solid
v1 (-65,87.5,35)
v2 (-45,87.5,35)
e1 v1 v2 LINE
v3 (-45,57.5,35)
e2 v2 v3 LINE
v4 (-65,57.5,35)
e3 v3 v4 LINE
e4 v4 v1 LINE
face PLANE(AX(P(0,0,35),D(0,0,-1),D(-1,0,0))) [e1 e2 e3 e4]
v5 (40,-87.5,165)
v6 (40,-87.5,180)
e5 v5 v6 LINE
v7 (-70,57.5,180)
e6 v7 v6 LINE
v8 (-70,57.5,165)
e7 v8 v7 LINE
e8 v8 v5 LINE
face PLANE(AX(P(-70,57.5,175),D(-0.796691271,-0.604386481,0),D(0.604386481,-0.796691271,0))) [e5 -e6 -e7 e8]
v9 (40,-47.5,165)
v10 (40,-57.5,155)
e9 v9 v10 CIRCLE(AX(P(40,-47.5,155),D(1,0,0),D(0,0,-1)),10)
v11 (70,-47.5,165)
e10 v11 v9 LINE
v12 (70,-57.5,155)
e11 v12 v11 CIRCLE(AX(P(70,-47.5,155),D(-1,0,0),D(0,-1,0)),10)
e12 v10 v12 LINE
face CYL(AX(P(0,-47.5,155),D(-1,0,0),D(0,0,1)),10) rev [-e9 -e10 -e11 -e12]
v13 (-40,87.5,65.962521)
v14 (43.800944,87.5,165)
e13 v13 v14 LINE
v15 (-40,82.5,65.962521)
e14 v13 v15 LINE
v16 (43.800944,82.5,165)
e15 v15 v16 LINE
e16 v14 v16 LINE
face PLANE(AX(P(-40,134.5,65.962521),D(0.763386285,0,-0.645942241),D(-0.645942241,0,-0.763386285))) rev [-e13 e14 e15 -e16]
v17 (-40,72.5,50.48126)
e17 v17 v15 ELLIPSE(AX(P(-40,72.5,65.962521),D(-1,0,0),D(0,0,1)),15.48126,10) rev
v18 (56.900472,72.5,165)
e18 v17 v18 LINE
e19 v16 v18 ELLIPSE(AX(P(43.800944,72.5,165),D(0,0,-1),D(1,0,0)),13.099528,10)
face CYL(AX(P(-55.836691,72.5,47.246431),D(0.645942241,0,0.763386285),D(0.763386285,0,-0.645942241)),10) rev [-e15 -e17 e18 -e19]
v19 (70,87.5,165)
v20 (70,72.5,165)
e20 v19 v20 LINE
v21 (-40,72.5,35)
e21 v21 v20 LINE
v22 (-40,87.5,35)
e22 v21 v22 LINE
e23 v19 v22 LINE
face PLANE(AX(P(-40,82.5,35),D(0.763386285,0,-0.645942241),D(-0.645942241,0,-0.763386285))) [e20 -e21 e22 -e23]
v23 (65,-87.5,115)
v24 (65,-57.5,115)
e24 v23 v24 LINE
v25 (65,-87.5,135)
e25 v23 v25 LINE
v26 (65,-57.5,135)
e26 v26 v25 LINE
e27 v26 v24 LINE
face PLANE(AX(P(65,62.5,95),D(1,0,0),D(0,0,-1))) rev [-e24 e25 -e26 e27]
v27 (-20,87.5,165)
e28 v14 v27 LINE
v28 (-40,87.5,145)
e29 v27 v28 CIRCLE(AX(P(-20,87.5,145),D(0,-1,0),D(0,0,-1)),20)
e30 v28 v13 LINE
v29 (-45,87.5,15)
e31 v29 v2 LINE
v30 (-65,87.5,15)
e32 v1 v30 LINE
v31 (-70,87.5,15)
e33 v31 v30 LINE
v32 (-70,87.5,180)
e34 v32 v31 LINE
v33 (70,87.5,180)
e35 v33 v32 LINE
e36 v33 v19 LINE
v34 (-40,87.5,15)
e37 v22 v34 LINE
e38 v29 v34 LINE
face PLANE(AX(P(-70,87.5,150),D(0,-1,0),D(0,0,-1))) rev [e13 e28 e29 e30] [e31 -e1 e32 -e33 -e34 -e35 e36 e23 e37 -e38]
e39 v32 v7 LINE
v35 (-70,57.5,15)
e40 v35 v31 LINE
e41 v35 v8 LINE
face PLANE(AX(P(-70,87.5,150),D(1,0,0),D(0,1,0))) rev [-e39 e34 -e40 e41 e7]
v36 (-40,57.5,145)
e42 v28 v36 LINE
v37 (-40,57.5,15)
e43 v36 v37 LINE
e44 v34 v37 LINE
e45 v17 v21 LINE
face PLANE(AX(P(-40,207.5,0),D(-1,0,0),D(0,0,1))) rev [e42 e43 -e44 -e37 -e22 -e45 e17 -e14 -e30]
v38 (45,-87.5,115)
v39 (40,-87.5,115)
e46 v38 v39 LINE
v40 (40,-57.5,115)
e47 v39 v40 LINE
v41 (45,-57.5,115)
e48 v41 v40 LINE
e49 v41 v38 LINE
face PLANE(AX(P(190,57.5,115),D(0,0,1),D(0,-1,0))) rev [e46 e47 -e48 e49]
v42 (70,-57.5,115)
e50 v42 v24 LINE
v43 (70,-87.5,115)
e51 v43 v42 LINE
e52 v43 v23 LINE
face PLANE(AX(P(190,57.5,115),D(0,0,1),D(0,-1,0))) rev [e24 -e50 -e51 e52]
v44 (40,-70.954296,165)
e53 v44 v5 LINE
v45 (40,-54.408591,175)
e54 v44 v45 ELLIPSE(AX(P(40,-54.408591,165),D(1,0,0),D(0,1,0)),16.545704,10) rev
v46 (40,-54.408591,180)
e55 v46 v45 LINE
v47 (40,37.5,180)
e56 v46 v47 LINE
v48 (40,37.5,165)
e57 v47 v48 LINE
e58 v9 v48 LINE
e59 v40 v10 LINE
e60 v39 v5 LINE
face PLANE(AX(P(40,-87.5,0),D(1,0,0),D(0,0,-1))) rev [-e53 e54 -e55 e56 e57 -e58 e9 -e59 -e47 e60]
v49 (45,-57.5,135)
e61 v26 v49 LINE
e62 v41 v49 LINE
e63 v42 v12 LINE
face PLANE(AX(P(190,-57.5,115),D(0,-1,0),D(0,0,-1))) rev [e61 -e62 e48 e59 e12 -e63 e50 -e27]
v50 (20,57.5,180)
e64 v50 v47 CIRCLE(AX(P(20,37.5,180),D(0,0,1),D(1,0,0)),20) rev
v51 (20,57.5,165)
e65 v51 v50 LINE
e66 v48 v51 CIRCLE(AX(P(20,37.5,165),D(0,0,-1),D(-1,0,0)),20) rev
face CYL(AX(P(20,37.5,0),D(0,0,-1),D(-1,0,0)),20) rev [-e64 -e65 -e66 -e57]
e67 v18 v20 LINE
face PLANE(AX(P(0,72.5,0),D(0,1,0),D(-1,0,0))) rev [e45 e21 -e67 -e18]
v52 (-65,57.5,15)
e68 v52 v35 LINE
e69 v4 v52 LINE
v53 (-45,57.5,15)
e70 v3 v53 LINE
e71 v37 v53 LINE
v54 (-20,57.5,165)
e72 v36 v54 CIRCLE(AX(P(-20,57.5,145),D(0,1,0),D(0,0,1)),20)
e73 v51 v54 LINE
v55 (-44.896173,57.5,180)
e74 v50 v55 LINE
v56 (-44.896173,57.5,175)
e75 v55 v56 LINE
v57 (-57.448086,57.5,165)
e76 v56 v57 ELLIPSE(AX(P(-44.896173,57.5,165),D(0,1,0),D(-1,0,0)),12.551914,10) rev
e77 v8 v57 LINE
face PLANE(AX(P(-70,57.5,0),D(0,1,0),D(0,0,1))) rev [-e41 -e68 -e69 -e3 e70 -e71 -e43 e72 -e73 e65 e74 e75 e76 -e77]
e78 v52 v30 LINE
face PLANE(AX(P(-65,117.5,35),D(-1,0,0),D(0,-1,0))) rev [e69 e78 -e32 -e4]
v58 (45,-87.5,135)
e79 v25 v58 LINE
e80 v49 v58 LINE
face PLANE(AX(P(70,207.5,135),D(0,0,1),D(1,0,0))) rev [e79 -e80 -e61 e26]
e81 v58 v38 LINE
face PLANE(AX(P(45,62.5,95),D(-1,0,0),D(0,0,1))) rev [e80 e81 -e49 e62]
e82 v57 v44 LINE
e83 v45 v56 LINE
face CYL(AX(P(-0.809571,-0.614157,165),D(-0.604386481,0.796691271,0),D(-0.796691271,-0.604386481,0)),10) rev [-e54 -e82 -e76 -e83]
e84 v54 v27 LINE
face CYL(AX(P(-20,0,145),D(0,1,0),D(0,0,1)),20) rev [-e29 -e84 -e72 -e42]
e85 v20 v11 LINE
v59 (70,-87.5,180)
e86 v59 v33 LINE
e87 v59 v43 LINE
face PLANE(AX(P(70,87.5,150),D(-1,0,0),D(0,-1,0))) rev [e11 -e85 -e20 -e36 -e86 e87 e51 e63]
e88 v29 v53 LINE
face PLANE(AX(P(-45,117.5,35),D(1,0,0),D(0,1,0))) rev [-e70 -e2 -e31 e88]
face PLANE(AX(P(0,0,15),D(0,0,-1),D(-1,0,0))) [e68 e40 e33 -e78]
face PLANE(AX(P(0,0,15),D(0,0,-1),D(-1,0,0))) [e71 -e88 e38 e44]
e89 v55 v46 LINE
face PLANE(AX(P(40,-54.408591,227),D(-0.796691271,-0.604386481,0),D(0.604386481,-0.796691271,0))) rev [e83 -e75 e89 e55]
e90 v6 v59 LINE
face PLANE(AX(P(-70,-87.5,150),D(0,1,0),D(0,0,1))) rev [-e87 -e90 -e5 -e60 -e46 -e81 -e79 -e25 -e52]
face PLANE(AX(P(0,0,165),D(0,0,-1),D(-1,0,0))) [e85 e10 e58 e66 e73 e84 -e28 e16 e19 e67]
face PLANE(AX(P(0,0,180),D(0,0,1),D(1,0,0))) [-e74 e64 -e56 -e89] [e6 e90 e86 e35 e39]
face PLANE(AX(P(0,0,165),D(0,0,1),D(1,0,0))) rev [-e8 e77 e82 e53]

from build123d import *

# Parameters (mm, degrees)
SKETCH_1_W           = 140
SKETCH_1_H           = 175
EXTRUDE_1_DEPTH      = 150
SKETCH_2_W           = 110
SKETCH_2_H           = 145
CUT_EXTRUDE_1_DEPTH  = 150
SKETCH_3_W           = 115
SKETCH_3_H           = 145
CUT_EXTRUDE_2_DEPTH  = 150
SKETCH_4_W           = 110
SKETCH_4_H           = 135
CUT_EXTRUDE_3_DEPTH  = 150
SKETCH_5_W           = 20
SKETCH_5_H           = 40
CUT_EXTRUDE_4_DEPTH  = 150
SKETCH_6_W           = 20
SKETCH_6_H           = 115
CUT_EXTRUDE_5_DEPTH  = 150
EXTRUDE_2_DEPTH      = 30
CUT_EXTRUDE_6_DEPTH  = 30
SKETCH_9_W           = 30
SKETCH_9_H           = 30
CUT_EXTRUDE_7_DEPTH  = 15
SKETCH_10_W          = 20
SKETCH_10_H          = 60
CUT_EXTRUDE_8_DEPTH  = 20
EXTRUDE_3_DEPTH      = 5
EXTRUDE_4_DEPTH      = 5
EXTRUDE_1_2_DEPTH    = 10
EXTRUDE_2_2_DEPTH    = 10
FILLET_1_R           = 10
CUT_EXTRUDE_9_DEPTH  = 52
CUT_EXTRUDE_10_DEPTH = 52
FILLET_2_R           = 20
FILLET_3_R           = 10


with BuildPart() as part:
    # 草图1 → Extrude 1 (new body)
    with BuildSketch(Plane.XY):
        Rectangle(SKETCH_1_W, SKETCH_1_H)
    extrude(amount=EXTRUDE_1_DEPTH)

    # 草图2 → 切除-拉伸1 (cut)
    with BuildSketch(Plane.XY.offset(150)):
        with Locations((-15, -15)):
            Rectangle(SKETCH_2_W, SKETCH_2_H)
    extrude(amount=-CUT_EXTRUDE_1_DEPTH, mode=Mode.SUBTRACT)

    # 草图3 → 切除-拉伸2 (cut)
    with BuildSketch(Plane.ZY.offset(-40)):
        with Locations((57.5, -15)):
            Rectangle(SKETCH_3_W, SKETCH_3_H)
    extrude(amount=-CUT_EXTRUDE_2_DEPTH, mode=Mode.SUBTRACT)

    # 草图4 → 切除-拉伸3 (cut)
    with BuildSketch(Plane.XZ.offset(-57.5)):
        with Locations((15, 67.5)):
            Rectangle(SKETCH_4_W, SKETCH_4_H)
    extrude(amount=-CUT_EXTRUDE_3_DEPTH, mode=Mode.SUBTRACT)

    # 草图5 → 切除-拉伸4 (cut)
    with BuildSketch(Plane.XZ.offset(87.5)):
        with Locations((55, 115)):
            Rectangle(SKETCH_5_W, SKETCH_5_H)
    extrude(amount=-CUT_EXTRUDE_4_DEPTH, mode=Mode.SUBTRACT)

    # 草图6 → 切除-拉伸5 (cut)
    with BuildSketch(Plane.ZY.offset(-40)):
        with Locations((125, 0)):
            Rectangle(SKETCH_6_W, SKETCH_6_H)
    extrude(amount=-CUT_EXTRUDE_5_DEPTH, mode=Mode.SUBTRACT)

    # 草图7 → Extrude 2 (add)
    with BuildSketch(Plane.XY.offset(150)):
        Polygon((-70, 57.5), (40, 57.5), (40, -87.5), (70, -87.5), (70, 87.5), (-70, 87.5), align=None)
    extrude(amount=EXTRUDE_2_DEPTH)

    # 草图8 → 切除-拉伸6 (cut)
    with BuildSketch(Plane(origin=(0, 0, 135), x_dir=(-1, 0, 0), z_dir=(0, 0, -1))):
        Polygon((-65, -57.5), (-45, -57.5), (-40, -57.5), (-40, 57.5), (40, 57.5), (40, 87.5), (-70, 87.5), (-70, -57.5), align=None)
    extrude(amount=-CUT_EXTRUDE_6_DEPTH, mode=Mode.SUBTRACT)

    # 草图9 → 切除-拉伸7 (cut)
    with BuildSketch(Plane(origin=(0, 0, 0), x_dir=(-1, 0, 0), z_dir=(0, 0, -1))):
        with Locations((55, 72.5)):
            Rectangle(SKETCH_9_W, SKETCH_9_H)
    extrude(amount=-CUT_EXTRUDE_7_DEPTH, mode=Mode.SUBTRACT)

    # 草图10 → 切除-拉伸8 (cut)
    with BuildSketch(Plane(origin=(0, 0, 15), x_dir=(-1, 0, 0), z_dir=(0, 0, -1))):
        with Locations((55, 87.5)):
            Rectangle(SKETCH_10_W, SKETCH_10_H)
    extrude(amount=-CUT_EXTRUDE_8_DEPTH, mode=Mode.SUBTRACT)

    # 草图11 → 凸台-拉伸3 (add)
    with BuildSketch(Plane(origin=(0, 87.5, 0), x_dir=(1, 0, 0), z_dir=(0, 1, 0))):
        Polygon((-40, -35), (70, -165), (-40, -165), align=None)
    extrude(amount=-EXTRUDE_3_DEPTH)

    # 草图12 → 凸台-拉伸4 (add)
    with BuildSketch(Plane.XY.offset(180)):
        Polygon((-70, 57.5), (40, -87.5), (40, 57.5), align=None)
    extrude(amount=-EXTRUDE_4_DEPTH)

    # 草图13 → Extrude 1 2 (add)
    with BuildSketch(Plane(origin=(0, 0, 175), x_dir=(-1, 0, 0), z_dir=(0, 0, -1))):
        Polygon((70, 57.5), (-40, -87.5), (-47.966912709, -81.456135186), (62.033087291, 63.543864814), align=None)
    extrude(amount=EXTRUDE_1_2_DEPTH)

    # 草图14 → Extrude 2 2 (add)
    with BuildSketch(Plane.XZ.offset(-82.5)):
        Polygon((-40, 35), (70, 165), (62.366137146, 171.459422415), (-47.633862854, 41.459422415), align=None)
    extrude(amount=EXTRUDE_2_2_DEPTH)

    # 圆角1
    fillet_1_edges = [part.edges().sort_by_distance(p)[0] for p in [
        (8.450236013, 82.5, 107.740630166),
        (-8.724043199, -6.727147853, 175),
    ]]
    fillet(fillet_1_edges, radius=FILLET_1_R - 0.0001)  # a hair under: the kernel refuses the full size

    # 草图15 → 切除-拉伸9 (cut)
    with BuildSketch(Plane(origin=(0, 0, 175), x_dir=(-1, 0, 0), z_dir=(0, 0, -1))):
        Polygon((-40, 57.5), (-40, -54.408591412), (44.896172796, 57.5), align=None)
    extrude(amount=-CUT_EXTRUDE_9_DEPTH, mode=Mode.SUBTRACT)

    # 草图16 → 切除-拉伸10 (cut)
    with BuildSketch(Plane.XZ.offset(-82.5)):
        Polygon((-40, 165), (-40, 65.962520665), (43.800944052, 165), align=None)
    extrude(amount=-CUT_EXTRUDE_10_DEPTH, mode=Mode.SUBTRACT)

    # 圆角2
    fillet_2_edges = [part.edges().sort_by_distance(p)[0] for p in [
        (40, 57.5, 172.5),
        (-40, 72.5, 165),
    ]]
    fillet(fillet_2_edges, radius=FILLET_2_R)

    # 圆角3
    fillet_3_edges = [part.edges().sort_by_distance(p)[0] for p in [
        (55, -57.5, 165),
    ]]
    fillet(fillet_3_edges, radius=FILLET_3_R)


solid = part.part
